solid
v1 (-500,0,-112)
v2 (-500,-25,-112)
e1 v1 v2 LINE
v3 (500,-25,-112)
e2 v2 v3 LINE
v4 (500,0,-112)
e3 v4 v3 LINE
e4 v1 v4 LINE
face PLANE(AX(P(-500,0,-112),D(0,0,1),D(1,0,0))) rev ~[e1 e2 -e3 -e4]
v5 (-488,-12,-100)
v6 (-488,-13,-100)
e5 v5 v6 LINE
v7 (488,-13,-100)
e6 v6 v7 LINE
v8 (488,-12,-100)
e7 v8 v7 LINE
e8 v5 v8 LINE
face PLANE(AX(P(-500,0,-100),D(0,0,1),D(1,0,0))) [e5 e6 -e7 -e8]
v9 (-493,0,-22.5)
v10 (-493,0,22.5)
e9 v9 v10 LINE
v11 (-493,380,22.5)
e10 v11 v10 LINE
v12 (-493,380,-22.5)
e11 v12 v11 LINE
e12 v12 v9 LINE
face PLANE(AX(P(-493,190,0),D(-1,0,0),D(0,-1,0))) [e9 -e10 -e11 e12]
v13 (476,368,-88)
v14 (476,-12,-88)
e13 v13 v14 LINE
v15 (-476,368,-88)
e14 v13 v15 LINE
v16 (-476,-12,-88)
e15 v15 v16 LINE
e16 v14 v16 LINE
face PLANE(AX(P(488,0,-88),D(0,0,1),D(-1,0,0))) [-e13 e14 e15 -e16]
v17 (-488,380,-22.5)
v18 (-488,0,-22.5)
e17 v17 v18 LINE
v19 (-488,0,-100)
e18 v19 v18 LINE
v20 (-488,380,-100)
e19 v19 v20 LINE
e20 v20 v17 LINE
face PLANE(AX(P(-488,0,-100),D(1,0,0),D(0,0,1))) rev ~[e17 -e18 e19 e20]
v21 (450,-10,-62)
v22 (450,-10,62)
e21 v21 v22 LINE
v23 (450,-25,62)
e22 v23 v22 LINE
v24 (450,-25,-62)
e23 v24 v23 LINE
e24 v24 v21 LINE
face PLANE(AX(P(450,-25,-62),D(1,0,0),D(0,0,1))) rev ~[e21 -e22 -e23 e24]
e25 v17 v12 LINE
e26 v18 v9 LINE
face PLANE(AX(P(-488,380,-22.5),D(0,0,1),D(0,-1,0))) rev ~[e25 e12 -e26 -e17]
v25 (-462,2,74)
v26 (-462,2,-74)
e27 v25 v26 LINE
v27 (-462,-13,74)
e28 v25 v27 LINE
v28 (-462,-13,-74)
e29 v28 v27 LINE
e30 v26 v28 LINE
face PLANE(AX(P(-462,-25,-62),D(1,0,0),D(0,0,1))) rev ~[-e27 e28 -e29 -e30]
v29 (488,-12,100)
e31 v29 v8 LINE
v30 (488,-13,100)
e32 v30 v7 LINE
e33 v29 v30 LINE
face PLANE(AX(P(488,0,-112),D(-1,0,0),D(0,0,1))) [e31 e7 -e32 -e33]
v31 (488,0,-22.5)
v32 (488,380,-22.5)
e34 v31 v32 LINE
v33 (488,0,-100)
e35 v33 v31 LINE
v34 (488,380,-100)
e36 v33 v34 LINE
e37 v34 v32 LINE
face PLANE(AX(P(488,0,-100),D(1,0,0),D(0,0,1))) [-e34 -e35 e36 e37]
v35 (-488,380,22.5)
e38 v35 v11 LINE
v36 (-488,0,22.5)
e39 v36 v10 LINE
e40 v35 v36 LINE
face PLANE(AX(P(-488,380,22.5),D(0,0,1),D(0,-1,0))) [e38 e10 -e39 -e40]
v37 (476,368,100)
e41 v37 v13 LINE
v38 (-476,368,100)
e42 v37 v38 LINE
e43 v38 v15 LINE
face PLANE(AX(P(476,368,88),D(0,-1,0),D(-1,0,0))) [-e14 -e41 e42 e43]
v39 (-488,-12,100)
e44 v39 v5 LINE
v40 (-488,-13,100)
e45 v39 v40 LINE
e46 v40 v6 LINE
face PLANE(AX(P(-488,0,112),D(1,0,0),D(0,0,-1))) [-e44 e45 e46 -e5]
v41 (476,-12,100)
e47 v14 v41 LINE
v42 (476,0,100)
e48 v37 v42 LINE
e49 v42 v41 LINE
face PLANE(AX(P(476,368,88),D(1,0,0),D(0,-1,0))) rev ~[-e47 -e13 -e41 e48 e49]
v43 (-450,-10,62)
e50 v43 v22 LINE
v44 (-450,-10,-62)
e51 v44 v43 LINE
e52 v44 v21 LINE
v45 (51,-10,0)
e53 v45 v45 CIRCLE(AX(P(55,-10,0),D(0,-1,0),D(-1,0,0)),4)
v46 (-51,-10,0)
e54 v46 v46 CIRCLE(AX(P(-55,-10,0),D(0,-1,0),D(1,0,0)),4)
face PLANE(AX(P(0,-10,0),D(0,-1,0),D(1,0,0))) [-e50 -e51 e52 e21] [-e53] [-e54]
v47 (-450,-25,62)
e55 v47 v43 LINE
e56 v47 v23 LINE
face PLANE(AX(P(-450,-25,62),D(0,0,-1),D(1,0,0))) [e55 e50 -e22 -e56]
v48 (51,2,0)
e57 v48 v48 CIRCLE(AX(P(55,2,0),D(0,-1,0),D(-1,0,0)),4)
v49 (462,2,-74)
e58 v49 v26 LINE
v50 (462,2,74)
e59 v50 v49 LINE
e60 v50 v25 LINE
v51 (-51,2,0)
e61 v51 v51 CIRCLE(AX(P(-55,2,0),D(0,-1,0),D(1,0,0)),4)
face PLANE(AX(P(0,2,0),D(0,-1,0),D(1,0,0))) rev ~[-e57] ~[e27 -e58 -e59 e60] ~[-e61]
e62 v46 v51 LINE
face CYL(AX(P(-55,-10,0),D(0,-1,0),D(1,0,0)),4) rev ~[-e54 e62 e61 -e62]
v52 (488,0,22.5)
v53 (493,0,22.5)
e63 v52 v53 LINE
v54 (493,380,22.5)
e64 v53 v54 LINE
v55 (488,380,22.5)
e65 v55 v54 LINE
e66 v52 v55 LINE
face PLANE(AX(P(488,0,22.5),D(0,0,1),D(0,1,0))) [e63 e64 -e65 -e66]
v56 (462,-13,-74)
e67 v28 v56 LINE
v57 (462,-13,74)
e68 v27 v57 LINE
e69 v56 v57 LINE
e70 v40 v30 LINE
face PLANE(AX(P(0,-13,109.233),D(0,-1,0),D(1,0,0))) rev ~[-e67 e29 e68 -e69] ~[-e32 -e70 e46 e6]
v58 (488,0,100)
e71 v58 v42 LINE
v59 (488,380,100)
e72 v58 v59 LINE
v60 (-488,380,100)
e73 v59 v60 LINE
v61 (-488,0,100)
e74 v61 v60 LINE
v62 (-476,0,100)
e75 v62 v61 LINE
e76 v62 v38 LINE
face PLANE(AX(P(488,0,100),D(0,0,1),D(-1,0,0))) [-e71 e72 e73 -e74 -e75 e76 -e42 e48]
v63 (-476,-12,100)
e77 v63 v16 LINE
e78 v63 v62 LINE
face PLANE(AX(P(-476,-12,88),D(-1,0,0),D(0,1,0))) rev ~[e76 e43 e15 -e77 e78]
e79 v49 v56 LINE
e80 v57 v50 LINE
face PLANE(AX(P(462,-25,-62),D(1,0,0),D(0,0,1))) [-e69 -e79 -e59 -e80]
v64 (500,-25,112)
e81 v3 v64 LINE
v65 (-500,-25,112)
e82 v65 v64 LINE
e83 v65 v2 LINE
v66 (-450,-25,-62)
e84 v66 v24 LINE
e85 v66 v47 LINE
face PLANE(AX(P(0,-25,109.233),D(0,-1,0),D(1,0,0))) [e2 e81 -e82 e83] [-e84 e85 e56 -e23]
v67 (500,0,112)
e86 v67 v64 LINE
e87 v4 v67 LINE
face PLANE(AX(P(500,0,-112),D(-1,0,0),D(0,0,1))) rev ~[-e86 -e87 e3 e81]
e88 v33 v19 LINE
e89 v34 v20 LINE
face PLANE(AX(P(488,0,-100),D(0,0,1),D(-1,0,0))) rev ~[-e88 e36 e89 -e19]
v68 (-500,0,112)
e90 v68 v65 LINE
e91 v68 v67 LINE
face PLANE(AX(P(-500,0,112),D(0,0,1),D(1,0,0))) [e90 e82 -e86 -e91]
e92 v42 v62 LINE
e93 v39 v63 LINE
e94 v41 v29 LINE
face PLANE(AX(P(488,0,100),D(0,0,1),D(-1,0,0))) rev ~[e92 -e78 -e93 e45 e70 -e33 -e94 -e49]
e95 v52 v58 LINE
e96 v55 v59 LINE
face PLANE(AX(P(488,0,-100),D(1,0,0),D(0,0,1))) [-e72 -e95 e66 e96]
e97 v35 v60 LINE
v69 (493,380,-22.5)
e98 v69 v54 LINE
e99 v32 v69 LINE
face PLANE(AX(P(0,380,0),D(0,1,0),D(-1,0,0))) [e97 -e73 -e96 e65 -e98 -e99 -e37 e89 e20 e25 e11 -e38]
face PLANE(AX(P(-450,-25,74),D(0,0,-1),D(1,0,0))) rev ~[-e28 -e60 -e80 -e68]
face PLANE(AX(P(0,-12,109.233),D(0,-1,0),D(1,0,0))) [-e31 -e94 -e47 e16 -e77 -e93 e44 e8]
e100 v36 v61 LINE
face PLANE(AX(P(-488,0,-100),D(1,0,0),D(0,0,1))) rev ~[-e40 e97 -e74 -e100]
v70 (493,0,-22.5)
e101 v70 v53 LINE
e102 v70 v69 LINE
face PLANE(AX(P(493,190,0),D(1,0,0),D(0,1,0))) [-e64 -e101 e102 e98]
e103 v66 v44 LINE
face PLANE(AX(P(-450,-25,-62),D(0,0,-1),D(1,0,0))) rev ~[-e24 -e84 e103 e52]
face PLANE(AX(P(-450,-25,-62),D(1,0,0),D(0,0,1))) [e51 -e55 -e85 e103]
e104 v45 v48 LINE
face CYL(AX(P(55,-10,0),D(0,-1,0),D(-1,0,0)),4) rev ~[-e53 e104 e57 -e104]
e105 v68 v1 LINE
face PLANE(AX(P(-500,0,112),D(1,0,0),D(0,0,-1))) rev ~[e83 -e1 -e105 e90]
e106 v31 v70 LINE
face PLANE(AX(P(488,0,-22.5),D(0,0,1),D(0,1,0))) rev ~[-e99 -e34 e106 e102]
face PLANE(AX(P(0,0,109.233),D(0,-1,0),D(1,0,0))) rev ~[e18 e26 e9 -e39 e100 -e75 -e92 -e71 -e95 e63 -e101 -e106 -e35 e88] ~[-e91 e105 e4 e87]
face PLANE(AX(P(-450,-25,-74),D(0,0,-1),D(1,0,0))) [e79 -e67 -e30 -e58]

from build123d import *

# Parameters (mm, degrees)
F0_W      = 1000
F0_H      = 5.5340008238
F0_H_2    = 212.9319983523
F1_DEPTH  = 25
F2_W      = 900
F2_H      = 124
F3_DEPTH  = 15
F4_W      = 976
F4_H      = 200
F5_DEPTH  = 380
F6_T      = -12
F7_W      = 380
F7_H      = 45
F8_DEPTH  = 5
F9_W      = 380
F9_H      = 45
F10_DEPTH = 5
F11_R     = 4
F12_DEPTH = 12


# Not quite as in the source:
# - a shell that OpenCascade refuses in one call is made with other operations: the cavity is built on its own and cut out


with BuildPart() as f1:
    # F0 (on Front) → F1 (new body)
    with BuildSketch(Plane.XZ):
        with Locations((0, 109.2329995881)):
            Rectangle(F0_W, F0_H)
        Rectangle(F0_W, F0_H_2)
        with Locations((0, -109.2329995881)):
            Rectangle(F0_W, F0_H)
    extrude(amount=F1_DEPTH)

    # F2 (on face) → F3 (cut)
    with BuildSketch(Plane.XZ.offset(25)):
        Rectangle(F2_W, F2_H)
    extrude(amount=-F3_DEPTH, mode=Mode.SUBTRACT)

    # F4 (on face) → F5 (join)
    with BuildSketch(Plane(origin=(0, 0, 0), x_dir=(-1, 0, 0), z_dir=(0, 1, 0))):
        Rectangle(F4_W, F4_H)
    extrude(amount=F5_DEPTH)

    # F6: a shell. OpenCascade refuses it in one call, so the cavity is built on its own and cut out:
    # the body offset inwards by the wall thickness, plus a prism from it out through each open face.
    f6_core = offset(f1.part, amount=F6_T, kind=Kind.INTERSECTION, mode=Mode.PRIVATE)
    f6_exits = [f6_core.faces().sort_by_distance(p)[0] for p in [
        (0, 178, 88),
    ]]
    add(f6_core, mode=Mode.SUBTRACT)
    extrude(f6_exits, amount=-F6_T, mode=Mode.SUBTRACT)

    # F7 (on face) → F8 (join)
    with BuildSketch(Plane(origin=(-488, 0, 0), x_dir=(0, -1, 0), z_dir=(-1, 0, 0))):
        with Locations((-190, 0)):
            Rectangle(F7_W, F7_H)
    extrude(amount=F8_DEPTH)

    # F9 (on face) → F10 (join)
    with BuildSketch(Plane.YZ.offset(488)):
        with Locations((190, 0)):
            Rectangle(F9_W, F9_H)
    extrude(amount=F10_DEPTH)

    # F11 (on face) → F12 (cut, through all)
    with BuildSketch(Plane.XZ.offset(10)):
        with Locations((-55, 0)):
            Circle(F11_R)
        with BuildLine():
            ThreePointArc((59, 0), (55, 4), (51, 0))
            ThreePointArc((51, 0), (55, -4), (59, 0))
        make_face()
    extrude(amount=-F12_DEPTH, mode=Mode.SUBTRACT)


solid = f1.part
